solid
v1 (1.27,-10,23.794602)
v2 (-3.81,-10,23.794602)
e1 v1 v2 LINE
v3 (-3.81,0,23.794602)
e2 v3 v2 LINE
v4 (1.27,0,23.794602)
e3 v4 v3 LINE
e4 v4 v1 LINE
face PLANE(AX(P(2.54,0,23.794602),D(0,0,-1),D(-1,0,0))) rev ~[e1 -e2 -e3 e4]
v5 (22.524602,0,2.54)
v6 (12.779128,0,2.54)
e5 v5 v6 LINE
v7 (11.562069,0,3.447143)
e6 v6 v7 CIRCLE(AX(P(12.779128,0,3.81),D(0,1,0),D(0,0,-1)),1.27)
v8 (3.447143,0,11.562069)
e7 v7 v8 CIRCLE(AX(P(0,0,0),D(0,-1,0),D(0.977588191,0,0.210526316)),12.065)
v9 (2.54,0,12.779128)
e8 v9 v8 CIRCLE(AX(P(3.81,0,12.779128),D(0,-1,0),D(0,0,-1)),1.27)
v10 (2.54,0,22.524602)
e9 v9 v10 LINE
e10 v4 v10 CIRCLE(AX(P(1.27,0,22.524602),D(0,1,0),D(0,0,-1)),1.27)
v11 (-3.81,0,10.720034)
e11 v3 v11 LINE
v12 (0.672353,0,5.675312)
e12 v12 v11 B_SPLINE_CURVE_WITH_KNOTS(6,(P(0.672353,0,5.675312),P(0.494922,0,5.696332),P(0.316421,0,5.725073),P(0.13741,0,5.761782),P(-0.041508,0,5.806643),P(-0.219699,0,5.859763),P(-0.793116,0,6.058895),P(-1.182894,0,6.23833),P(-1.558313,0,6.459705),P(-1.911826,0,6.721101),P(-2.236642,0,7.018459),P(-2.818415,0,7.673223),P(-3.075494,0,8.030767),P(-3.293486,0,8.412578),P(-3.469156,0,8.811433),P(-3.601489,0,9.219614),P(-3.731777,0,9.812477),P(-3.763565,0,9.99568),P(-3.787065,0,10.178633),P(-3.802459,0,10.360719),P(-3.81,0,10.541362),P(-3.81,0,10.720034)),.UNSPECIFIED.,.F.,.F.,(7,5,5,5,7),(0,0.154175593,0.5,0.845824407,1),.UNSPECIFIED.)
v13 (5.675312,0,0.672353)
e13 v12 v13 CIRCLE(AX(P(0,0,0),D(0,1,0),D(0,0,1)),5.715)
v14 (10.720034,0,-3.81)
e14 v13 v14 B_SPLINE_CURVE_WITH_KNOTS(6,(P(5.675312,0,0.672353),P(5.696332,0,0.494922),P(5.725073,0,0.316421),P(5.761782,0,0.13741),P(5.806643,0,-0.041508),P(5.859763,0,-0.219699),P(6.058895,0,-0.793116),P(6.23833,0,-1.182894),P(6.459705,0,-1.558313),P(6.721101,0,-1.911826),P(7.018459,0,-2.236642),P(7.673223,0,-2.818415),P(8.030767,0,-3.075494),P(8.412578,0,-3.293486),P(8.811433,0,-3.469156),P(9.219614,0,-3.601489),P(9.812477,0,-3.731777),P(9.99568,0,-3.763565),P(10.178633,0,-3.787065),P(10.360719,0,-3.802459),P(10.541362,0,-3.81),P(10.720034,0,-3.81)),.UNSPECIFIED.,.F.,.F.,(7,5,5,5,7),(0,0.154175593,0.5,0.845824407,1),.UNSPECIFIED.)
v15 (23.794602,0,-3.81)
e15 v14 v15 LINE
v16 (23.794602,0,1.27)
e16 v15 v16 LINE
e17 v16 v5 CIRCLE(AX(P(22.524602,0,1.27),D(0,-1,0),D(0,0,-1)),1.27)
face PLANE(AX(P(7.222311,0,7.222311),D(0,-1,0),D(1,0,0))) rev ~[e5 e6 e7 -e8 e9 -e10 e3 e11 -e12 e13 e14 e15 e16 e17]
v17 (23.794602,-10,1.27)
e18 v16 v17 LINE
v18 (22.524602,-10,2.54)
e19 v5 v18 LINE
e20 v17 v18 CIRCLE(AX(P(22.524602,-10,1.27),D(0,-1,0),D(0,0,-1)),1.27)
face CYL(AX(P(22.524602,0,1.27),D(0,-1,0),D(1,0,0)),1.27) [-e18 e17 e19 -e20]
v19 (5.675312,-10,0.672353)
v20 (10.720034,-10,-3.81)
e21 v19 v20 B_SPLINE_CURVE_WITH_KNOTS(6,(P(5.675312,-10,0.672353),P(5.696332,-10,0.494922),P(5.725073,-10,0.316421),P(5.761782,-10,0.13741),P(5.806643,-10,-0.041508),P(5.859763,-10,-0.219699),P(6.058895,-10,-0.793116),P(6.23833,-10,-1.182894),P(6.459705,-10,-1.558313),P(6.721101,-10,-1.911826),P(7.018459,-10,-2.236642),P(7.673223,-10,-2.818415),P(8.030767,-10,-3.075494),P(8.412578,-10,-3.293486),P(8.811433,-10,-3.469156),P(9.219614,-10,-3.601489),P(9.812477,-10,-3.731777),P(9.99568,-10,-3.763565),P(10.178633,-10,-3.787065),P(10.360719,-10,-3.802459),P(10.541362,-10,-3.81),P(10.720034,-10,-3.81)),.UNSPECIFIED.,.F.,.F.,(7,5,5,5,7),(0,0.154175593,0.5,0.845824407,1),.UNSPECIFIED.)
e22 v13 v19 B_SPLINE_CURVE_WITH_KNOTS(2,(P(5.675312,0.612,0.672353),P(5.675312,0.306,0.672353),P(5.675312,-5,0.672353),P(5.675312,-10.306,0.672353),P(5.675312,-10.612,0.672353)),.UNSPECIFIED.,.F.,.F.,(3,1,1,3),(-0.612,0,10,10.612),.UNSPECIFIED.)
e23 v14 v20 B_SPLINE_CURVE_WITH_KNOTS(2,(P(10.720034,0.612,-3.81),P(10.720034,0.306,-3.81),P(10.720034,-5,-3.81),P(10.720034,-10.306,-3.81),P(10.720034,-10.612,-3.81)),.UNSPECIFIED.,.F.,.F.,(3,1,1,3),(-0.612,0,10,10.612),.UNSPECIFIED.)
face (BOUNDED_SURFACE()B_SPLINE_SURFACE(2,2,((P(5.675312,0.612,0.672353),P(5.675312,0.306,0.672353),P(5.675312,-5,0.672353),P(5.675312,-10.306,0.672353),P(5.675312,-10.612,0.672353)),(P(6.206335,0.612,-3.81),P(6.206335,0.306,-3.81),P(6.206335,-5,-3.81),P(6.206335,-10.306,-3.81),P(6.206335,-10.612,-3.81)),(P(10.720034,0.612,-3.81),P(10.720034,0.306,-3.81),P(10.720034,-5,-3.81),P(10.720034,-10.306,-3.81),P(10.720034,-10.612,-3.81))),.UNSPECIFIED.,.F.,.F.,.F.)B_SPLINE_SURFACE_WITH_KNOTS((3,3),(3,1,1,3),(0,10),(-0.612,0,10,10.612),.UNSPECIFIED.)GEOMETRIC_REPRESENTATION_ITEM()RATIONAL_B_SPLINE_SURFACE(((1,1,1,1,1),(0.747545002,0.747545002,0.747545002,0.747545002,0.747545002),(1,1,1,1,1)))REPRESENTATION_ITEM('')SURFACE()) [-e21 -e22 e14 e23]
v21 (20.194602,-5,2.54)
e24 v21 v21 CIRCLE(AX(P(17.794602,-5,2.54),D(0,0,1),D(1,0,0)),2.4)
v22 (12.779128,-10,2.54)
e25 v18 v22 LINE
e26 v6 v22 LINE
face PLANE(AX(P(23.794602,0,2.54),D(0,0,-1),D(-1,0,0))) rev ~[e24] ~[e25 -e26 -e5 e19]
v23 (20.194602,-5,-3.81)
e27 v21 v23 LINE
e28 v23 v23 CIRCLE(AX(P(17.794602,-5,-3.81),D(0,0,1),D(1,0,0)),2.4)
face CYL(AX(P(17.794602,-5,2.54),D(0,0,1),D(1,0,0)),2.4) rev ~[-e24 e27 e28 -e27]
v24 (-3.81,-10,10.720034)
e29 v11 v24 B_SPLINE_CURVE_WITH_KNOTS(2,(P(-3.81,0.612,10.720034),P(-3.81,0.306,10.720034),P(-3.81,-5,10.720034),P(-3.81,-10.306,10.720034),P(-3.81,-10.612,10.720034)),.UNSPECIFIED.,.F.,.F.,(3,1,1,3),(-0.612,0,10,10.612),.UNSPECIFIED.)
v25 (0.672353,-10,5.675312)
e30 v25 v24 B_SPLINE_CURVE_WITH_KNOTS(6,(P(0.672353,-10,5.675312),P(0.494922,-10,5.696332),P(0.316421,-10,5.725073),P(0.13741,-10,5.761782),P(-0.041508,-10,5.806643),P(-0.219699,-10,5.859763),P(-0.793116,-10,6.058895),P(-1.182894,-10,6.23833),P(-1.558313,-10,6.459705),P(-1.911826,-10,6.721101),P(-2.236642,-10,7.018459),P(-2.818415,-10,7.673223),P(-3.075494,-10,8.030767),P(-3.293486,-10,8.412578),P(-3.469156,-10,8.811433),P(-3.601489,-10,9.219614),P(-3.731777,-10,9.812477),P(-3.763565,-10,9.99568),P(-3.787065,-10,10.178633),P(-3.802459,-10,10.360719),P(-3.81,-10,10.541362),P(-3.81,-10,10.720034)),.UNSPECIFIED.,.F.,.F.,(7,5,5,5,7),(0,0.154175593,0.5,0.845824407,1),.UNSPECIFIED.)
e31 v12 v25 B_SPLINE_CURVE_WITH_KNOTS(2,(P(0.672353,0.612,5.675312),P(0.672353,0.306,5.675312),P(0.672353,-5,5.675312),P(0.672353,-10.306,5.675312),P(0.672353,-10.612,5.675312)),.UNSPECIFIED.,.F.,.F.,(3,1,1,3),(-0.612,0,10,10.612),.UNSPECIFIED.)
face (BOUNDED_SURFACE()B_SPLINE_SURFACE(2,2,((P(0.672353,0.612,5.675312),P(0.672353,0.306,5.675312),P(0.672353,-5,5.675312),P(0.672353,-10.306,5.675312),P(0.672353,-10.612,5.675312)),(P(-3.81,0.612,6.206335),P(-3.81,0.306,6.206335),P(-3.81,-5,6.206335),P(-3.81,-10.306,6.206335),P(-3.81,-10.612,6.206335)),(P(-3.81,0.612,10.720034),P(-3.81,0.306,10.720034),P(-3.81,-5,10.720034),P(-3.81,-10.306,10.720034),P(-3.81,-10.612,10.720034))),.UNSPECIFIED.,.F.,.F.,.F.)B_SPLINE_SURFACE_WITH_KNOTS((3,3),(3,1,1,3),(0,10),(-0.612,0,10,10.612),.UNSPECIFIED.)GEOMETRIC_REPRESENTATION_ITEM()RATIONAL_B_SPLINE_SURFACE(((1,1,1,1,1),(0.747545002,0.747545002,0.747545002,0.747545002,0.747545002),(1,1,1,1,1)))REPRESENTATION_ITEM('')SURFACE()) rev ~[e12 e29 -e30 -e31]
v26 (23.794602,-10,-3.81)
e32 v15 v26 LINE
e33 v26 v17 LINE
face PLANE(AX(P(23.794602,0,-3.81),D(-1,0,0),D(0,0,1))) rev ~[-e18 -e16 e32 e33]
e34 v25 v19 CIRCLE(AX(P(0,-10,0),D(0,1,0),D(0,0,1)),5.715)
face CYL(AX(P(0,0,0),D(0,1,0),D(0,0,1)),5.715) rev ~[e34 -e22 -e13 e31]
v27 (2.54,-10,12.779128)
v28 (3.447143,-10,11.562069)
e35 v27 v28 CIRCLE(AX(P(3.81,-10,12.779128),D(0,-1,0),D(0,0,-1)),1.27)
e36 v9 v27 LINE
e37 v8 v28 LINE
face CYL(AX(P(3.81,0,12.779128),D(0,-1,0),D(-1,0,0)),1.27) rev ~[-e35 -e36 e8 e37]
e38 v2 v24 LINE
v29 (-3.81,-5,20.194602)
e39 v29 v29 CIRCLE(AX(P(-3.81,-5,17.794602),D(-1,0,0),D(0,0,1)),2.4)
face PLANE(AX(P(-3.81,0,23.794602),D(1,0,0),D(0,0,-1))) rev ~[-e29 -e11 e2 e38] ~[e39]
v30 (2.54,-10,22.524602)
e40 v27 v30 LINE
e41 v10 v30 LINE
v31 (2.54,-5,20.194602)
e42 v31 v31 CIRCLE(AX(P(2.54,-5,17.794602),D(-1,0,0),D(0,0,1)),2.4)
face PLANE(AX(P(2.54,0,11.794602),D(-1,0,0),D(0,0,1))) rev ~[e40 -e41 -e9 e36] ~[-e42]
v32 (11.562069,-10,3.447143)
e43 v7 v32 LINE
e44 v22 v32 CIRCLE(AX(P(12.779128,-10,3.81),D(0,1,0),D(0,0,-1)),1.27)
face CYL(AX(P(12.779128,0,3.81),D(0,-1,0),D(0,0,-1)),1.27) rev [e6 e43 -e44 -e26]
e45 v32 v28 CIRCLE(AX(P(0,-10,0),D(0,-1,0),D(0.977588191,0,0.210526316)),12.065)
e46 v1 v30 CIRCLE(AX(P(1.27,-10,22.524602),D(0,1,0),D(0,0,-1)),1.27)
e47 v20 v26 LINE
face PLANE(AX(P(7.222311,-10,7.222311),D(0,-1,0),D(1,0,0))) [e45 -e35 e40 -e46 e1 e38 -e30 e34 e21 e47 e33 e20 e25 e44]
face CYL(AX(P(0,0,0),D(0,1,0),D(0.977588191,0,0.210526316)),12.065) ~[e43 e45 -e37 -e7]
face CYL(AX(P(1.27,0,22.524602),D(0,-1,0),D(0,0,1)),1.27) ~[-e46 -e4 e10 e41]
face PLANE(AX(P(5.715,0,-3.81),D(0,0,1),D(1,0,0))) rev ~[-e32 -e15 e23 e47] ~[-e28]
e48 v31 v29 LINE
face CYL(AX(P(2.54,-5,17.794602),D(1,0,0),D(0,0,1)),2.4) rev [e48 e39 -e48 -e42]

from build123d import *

# Parameters (mm, degrees)
F1_DEPTH = 10
F2_R     = 2.4
F3_DEPTH = 6.35
F7_R     = 5.08
F8_R     = 1.27


# Not quite as in the source:
# - a pattern or mirror of a feature is missing from the dataset's text; its kind, count and spacing are read off the source's solid


with BuildPart() as f1:
    # F0 (on Front) → F1 (new body)
    with BuildSketch(Plane.XZ):
        with BuildLine():
            ThreePointArc((0, 5.715), (4.0411152545, 4.0411152545), (5.715, 0))
            Line((5.715, 0), (5.715, -3.81))
            Line((5.715, -3.81), (23.7946015193, -3.81))
            Line((23.7946015193, -3.81), (23.7946015193, 2.54))
            Line((23.7946015193, 2.54), (11.7946015193, 2.54))
            ThreePointArc((11.7946015193, 2.54), (8.531243315, 8.531243315), (2.54, 11.7946015193))
            Line((2.54, 11.7946015193), (2.54, 23.7946015193))
            Line((2.54, 23.7946015193), (-3.81, 23.7946015193))
            Line((-3.81, 23.7946015193), (-3.81, 5.715))
            Line((-3.81, 5.715), (0, 5.715))
        make_face()
    extrude(amount=F1_DEPTH)

    # F2 (on face) → F3 (cut, through all)
    with BuildSketch(Plane.XY.offset(2.54)):
        with Locations((17.7946015193, -5)):
            Circle(F2_R)
    f3 = extrude(amount=-F3_DEPTH, mode=Mode.SUBTRACT)

    # F3_copies: F3 across plane
    add(f3.mirror(Plane(origin=(0, 0, 0), x_dir=(0.7071067812, 0, 0.7071067812), z_dir=(-0.7071067812, 0, 0.7071067812))), mode=Mode.SUBTRACT)

    # F7
    f7_edges = [f1.edges().sort_by_distance(p)[0] for p in [
        (-3.81, -5, 5.715),
        (5.715, -5, -3.81),
    ]]
    fillet(f7_edges, radius=F7_R)

    # F8
    f8_edges = [f1.edges().sort_by_distance(p)[0] for p in [
        (2.54, -5, 23.794602),
        (2.54, -5, 11.794602),
        (11.794602, -5, 2.54),
        (23.794602, -5, 2.54),
    ]]
    fillet(f8_edges, radius=F8_R)


solid = f1.part
